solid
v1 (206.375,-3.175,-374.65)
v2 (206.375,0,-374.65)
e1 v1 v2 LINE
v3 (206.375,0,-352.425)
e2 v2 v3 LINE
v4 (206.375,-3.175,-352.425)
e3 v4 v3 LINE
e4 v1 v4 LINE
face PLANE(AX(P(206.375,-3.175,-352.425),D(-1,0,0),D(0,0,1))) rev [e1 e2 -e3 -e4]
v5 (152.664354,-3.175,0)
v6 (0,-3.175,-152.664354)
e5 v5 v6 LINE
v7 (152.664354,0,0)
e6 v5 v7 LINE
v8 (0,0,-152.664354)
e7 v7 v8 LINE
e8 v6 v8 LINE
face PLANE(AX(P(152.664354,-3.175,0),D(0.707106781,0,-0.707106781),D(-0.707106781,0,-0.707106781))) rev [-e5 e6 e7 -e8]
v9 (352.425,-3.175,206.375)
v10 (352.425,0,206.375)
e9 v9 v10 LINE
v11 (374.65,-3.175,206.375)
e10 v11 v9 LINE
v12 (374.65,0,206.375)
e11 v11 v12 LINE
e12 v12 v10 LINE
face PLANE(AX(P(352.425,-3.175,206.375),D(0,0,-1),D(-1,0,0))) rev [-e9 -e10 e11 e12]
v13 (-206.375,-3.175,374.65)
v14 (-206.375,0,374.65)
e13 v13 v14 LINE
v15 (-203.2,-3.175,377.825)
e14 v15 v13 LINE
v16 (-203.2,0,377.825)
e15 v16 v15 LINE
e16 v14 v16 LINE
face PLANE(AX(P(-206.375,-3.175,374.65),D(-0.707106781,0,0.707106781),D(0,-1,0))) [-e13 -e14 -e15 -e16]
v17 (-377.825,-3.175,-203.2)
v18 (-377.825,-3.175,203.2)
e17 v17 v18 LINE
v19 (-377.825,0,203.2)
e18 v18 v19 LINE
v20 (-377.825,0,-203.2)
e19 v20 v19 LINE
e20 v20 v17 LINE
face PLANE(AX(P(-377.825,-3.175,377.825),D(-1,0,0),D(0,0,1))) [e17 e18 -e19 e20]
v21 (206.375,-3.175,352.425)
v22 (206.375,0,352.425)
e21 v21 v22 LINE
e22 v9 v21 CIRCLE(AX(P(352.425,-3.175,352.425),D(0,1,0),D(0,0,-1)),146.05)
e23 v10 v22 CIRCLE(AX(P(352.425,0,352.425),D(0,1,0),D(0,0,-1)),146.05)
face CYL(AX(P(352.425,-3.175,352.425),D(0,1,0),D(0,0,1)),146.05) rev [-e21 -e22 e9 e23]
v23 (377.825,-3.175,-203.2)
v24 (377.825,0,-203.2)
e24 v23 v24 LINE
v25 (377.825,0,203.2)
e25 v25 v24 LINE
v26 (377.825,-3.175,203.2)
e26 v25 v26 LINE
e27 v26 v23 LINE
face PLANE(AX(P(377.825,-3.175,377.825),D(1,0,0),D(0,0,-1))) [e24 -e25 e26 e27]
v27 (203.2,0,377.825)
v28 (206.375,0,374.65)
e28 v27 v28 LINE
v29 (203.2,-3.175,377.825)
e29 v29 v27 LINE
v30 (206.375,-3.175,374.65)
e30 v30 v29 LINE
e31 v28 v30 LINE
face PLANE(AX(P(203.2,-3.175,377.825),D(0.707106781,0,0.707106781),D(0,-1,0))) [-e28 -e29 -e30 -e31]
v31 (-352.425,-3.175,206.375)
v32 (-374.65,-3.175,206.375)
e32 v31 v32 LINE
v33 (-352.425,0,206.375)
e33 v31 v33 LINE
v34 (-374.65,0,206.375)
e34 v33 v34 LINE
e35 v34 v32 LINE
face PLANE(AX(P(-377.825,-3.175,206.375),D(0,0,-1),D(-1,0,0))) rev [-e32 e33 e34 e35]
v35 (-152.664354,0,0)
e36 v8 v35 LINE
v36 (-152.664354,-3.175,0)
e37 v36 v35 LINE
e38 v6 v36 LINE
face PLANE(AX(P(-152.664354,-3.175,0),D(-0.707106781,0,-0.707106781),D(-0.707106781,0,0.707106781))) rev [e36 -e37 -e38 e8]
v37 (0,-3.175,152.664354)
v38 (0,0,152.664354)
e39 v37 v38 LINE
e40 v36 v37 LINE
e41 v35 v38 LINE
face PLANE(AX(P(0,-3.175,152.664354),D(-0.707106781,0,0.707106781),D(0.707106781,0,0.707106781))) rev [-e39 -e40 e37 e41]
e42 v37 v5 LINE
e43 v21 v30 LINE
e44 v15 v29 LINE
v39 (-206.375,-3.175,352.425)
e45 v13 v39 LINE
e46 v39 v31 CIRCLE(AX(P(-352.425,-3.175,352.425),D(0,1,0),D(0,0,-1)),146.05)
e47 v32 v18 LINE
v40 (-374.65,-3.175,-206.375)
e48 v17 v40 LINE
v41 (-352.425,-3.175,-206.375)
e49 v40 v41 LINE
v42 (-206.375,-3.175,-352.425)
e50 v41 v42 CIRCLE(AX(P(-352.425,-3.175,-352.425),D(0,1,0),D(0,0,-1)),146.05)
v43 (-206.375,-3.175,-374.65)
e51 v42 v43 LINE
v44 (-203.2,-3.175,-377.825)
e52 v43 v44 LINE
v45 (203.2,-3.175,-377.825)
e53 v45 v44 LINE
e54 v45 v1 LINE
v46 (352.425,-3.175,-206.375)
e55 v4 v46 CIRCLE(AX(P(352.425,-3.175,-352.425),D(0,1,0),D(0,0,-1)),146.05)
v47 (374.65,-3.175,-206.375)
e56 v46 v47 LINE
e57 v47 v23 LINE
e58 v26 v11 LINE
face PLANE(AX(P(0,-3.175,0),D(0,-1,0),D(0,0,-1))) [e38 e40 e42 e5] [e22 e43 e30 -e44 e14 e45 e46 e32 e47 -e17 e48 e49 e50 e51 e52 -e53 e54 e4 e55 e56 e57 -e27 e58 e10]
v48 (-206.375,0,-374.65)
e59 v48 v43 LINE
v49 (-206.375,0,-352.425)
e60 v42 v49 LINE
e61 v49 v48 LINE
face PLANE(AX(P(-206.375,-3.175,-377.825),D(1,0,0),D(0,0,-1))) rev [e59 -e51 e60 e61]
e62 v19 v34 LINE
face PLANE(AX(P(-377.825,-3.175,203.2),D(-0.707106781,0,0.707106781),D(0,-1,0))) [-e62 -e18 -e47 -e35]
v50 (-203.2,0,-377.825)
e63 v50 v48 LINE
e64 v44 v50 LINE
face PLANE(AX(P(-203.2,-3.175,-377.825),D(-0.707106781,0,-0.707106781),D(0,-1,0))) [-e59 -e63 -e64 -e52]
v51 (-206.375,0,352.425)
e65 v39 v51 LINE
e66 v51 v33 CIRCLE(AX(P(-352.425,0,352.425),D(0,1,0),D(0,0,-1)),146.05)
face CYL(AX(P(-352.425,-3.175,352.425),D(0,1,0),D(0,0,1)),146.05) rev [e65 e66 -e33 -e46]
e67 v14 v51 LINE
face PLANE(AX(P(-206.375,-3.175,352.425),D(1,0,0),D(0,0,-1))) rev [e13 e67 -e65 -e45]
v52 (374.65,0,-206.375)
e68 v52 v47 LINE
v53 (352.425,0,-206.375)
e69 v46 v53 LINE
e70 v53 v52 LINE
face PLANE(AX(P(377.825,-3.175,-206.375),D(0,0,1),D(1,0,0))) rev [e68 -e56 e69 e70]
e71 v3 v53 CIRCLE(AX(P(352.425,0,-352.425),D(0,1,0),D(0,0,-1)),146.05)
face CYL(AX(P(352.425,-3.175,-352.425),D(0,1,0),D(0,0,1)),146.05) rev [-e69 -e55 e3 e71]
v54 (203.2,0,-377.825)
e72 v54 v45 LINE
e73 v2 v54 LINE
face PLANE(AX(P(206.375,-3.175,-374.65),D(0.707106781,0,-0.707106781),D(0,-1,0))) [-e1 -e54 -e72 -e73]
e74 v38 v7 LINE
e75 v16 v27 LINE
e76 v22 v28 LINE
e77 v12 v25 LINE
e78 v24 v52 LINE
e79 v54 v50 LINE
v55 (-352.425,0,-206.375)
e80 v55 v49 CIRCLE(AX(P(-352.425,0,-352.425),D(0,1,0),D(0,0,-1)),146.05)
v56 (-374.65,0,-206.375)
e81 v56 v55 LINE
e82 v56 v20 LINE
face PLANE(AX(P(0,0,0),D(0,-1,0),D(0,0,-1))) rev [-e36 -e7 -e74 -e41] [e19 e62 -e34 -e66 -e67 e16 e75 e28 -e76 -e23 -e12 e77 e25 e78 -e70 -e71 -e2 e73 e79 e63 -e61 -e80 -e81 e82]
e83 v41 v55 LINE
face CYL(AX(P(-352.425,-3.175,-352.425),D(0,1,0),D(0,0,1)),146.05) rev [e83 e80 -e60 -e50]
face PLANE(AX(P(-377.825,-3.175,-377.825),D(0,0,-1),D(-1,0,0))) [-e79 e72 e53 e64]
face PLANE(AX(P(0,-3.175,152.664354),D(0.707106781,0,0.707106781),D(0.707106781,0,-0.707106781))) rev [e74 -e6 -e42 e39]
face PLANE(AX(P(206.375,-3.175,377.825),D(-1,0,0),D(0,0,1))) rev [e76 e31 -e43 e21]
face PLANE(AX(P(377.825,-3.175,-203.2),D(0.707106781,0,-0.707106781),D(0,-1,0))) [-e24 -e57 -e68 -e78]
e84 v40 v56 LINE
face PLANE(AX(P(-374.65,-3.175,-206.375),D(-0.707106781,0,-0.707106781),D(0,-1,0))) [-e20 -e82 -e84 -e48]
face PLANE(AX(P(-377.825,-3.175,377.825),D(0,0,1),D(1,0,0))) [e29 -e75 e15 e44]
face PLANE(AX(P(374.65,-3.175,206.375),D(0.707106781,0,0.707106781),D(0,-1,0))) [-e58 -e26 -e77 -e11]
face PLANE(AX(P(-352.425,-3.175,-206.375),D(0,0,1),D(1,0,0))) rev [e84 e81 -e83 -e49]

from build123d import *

# Parameters (mm, degrees)
SKETCH2_W           = 755.65
SKETCH2_H           = 755.65
BASE_FLANGE1_DEPTH  = 3.175
CUT_EXTRUDE1_DEPTH  = 535.334672162
CUT_EXTRUDE2_DEPTH  = 535.334672162
BREAK_CORNER1_START = -3.175
BREAK_CORNER1_DEPTH = 3.175


# Read off the part's stored shape, not the designer's step: Break-Corner1
# Sheet-metal steps are written as plain solids
with BuildPart() as part:
    # Sketch2 → Base-Flange1 (new body)
    with BuildSketch(Plane(origin=(0, 0, 0), x_dir=(1, 0, 0), z_dir=(0, 1, 0))):
        Rectangle(SKETCH2_W, SKETCH2_H)
    extrude(amount=-BASE_FLANGE1_DEPTH)

    # Sketch3 → Cut-Extrude1 (cut, through all)
    with BuildSketch(Plane(origin=(0, 0, 0), x_dir=(1, 0, 0), z_dir=(0, 1, 0))):
        Polygon((0, -152.664354058), (152.664354058, 0), (0, 152.664354058), (-152.664354058, 0), align=None)
    extrude(amount=-CUT_EXTRUDE1_DEPTH, mode=Mode.SUBTRACT)

    # Sketch4 → Cut-Extrude2 (cut, through all)
    with BuildSketch(Plane(origin=(0, 0, 0), x_dir=(1, 0, 0), z_dir=(0, 1, 0))):
        with BuildLine():
            Line((377.825, 206.375), (352.425, 206.375))
            ThreePointArc((352.425, 206.375), (249.152054608, 249.152054608), (206.375, 352.425))
            Line((206.375, 352.425), (206.375, 377.825))
            Line((206.375, 377.825), (377.825, 377.825))
            Line((377.825, 377.825), (377.825, 206.375))
        make_face()
        with BuildLine():
            Line((206.375, -377.825), (206.375, -352.425))
            ThreePointArc((206.375, -352.425), (249.152054608, -249.152054608), (352.425, -206.375))
            Line((352.425, -206.375), (377.825, -206.375))
            Line((377.825, -206.375), (377.825, -377.825))
            Line((377.825, -377.825), (206.375, -377.825))
        make_face()
        with BuildLine():
            Line((-377.825, -206.375), (-352.425, -206.375))
            ThreePointArc((-352.425, -206.375), (-249.152054608, -249.152054608), (-206.375, -352.425))
            Line((-206.375, -352.425), (-206.375, -377.825))
            Line((-206.375, -377.825), (-377.825, -377.825))
            Line((-377.825, -377.825), (-377.825, -206.375))
        make_face()
        with BuildLine():
            Line((-206.375, 377.825), (-206.375, 352.425))
            ThreePointArc((-206.375, 352.425), (-249.152054608, 249.152054608), (-352.425, 206.375))
            Line((-352.425, 206.375), (-377.825, 206.375))
            Line((-377.825, 206.375), (-377.825, 377.825))
            Line((-377.825, 377.825), (-206.375, 377.825))
        make_face()
    extrude(amount=-CUT_EXTRUDE2_DEPTH, mode=Mode.SUBTRACT)

    # Break-Corner1 outline → Break-Corner1 (cut)
    with BuildSketch(Plane(origin=(0, 0, 0), x_dir=(1, 0, 0), z_dir=(0, 1, 0)).offset(BREAK_CORNER1_START)):
        Polygon((-206.375, 374.65), (-203.2, 377.825), (-206.375, 377.825), align=None)
        Polygon((203.2, 377.825), (206.375, 374.65), (206.375, 377.825), align=None)
        Polygon((377.825, -206.375), (377.825, -203.2), (374.65, -206.375), align=None)
        Polygon((374.65, 206.375), (377.825, 203.2), (377.825, 206.375), align=None)
        Polygon((-374.65, -206.375), (-377.825, -203.2), (-377.825, -206.375), align=None)
        Polygon((-377.825, 203.2), (-374.65, 206.375), (-377.825, 206.375), align=None)
        Polygon((206.375, -374.65), (203.2, -377.825), (206.375, -377.825), align=None)
        Polygon((-203.2, -377.825), (-206.375, -374.65), (-206.375, -377.825), align=None)
    extrude(amount=BREAK_CORNER1_DEPTH, mode=Mode.SUBTRACT)


solid = part.part
